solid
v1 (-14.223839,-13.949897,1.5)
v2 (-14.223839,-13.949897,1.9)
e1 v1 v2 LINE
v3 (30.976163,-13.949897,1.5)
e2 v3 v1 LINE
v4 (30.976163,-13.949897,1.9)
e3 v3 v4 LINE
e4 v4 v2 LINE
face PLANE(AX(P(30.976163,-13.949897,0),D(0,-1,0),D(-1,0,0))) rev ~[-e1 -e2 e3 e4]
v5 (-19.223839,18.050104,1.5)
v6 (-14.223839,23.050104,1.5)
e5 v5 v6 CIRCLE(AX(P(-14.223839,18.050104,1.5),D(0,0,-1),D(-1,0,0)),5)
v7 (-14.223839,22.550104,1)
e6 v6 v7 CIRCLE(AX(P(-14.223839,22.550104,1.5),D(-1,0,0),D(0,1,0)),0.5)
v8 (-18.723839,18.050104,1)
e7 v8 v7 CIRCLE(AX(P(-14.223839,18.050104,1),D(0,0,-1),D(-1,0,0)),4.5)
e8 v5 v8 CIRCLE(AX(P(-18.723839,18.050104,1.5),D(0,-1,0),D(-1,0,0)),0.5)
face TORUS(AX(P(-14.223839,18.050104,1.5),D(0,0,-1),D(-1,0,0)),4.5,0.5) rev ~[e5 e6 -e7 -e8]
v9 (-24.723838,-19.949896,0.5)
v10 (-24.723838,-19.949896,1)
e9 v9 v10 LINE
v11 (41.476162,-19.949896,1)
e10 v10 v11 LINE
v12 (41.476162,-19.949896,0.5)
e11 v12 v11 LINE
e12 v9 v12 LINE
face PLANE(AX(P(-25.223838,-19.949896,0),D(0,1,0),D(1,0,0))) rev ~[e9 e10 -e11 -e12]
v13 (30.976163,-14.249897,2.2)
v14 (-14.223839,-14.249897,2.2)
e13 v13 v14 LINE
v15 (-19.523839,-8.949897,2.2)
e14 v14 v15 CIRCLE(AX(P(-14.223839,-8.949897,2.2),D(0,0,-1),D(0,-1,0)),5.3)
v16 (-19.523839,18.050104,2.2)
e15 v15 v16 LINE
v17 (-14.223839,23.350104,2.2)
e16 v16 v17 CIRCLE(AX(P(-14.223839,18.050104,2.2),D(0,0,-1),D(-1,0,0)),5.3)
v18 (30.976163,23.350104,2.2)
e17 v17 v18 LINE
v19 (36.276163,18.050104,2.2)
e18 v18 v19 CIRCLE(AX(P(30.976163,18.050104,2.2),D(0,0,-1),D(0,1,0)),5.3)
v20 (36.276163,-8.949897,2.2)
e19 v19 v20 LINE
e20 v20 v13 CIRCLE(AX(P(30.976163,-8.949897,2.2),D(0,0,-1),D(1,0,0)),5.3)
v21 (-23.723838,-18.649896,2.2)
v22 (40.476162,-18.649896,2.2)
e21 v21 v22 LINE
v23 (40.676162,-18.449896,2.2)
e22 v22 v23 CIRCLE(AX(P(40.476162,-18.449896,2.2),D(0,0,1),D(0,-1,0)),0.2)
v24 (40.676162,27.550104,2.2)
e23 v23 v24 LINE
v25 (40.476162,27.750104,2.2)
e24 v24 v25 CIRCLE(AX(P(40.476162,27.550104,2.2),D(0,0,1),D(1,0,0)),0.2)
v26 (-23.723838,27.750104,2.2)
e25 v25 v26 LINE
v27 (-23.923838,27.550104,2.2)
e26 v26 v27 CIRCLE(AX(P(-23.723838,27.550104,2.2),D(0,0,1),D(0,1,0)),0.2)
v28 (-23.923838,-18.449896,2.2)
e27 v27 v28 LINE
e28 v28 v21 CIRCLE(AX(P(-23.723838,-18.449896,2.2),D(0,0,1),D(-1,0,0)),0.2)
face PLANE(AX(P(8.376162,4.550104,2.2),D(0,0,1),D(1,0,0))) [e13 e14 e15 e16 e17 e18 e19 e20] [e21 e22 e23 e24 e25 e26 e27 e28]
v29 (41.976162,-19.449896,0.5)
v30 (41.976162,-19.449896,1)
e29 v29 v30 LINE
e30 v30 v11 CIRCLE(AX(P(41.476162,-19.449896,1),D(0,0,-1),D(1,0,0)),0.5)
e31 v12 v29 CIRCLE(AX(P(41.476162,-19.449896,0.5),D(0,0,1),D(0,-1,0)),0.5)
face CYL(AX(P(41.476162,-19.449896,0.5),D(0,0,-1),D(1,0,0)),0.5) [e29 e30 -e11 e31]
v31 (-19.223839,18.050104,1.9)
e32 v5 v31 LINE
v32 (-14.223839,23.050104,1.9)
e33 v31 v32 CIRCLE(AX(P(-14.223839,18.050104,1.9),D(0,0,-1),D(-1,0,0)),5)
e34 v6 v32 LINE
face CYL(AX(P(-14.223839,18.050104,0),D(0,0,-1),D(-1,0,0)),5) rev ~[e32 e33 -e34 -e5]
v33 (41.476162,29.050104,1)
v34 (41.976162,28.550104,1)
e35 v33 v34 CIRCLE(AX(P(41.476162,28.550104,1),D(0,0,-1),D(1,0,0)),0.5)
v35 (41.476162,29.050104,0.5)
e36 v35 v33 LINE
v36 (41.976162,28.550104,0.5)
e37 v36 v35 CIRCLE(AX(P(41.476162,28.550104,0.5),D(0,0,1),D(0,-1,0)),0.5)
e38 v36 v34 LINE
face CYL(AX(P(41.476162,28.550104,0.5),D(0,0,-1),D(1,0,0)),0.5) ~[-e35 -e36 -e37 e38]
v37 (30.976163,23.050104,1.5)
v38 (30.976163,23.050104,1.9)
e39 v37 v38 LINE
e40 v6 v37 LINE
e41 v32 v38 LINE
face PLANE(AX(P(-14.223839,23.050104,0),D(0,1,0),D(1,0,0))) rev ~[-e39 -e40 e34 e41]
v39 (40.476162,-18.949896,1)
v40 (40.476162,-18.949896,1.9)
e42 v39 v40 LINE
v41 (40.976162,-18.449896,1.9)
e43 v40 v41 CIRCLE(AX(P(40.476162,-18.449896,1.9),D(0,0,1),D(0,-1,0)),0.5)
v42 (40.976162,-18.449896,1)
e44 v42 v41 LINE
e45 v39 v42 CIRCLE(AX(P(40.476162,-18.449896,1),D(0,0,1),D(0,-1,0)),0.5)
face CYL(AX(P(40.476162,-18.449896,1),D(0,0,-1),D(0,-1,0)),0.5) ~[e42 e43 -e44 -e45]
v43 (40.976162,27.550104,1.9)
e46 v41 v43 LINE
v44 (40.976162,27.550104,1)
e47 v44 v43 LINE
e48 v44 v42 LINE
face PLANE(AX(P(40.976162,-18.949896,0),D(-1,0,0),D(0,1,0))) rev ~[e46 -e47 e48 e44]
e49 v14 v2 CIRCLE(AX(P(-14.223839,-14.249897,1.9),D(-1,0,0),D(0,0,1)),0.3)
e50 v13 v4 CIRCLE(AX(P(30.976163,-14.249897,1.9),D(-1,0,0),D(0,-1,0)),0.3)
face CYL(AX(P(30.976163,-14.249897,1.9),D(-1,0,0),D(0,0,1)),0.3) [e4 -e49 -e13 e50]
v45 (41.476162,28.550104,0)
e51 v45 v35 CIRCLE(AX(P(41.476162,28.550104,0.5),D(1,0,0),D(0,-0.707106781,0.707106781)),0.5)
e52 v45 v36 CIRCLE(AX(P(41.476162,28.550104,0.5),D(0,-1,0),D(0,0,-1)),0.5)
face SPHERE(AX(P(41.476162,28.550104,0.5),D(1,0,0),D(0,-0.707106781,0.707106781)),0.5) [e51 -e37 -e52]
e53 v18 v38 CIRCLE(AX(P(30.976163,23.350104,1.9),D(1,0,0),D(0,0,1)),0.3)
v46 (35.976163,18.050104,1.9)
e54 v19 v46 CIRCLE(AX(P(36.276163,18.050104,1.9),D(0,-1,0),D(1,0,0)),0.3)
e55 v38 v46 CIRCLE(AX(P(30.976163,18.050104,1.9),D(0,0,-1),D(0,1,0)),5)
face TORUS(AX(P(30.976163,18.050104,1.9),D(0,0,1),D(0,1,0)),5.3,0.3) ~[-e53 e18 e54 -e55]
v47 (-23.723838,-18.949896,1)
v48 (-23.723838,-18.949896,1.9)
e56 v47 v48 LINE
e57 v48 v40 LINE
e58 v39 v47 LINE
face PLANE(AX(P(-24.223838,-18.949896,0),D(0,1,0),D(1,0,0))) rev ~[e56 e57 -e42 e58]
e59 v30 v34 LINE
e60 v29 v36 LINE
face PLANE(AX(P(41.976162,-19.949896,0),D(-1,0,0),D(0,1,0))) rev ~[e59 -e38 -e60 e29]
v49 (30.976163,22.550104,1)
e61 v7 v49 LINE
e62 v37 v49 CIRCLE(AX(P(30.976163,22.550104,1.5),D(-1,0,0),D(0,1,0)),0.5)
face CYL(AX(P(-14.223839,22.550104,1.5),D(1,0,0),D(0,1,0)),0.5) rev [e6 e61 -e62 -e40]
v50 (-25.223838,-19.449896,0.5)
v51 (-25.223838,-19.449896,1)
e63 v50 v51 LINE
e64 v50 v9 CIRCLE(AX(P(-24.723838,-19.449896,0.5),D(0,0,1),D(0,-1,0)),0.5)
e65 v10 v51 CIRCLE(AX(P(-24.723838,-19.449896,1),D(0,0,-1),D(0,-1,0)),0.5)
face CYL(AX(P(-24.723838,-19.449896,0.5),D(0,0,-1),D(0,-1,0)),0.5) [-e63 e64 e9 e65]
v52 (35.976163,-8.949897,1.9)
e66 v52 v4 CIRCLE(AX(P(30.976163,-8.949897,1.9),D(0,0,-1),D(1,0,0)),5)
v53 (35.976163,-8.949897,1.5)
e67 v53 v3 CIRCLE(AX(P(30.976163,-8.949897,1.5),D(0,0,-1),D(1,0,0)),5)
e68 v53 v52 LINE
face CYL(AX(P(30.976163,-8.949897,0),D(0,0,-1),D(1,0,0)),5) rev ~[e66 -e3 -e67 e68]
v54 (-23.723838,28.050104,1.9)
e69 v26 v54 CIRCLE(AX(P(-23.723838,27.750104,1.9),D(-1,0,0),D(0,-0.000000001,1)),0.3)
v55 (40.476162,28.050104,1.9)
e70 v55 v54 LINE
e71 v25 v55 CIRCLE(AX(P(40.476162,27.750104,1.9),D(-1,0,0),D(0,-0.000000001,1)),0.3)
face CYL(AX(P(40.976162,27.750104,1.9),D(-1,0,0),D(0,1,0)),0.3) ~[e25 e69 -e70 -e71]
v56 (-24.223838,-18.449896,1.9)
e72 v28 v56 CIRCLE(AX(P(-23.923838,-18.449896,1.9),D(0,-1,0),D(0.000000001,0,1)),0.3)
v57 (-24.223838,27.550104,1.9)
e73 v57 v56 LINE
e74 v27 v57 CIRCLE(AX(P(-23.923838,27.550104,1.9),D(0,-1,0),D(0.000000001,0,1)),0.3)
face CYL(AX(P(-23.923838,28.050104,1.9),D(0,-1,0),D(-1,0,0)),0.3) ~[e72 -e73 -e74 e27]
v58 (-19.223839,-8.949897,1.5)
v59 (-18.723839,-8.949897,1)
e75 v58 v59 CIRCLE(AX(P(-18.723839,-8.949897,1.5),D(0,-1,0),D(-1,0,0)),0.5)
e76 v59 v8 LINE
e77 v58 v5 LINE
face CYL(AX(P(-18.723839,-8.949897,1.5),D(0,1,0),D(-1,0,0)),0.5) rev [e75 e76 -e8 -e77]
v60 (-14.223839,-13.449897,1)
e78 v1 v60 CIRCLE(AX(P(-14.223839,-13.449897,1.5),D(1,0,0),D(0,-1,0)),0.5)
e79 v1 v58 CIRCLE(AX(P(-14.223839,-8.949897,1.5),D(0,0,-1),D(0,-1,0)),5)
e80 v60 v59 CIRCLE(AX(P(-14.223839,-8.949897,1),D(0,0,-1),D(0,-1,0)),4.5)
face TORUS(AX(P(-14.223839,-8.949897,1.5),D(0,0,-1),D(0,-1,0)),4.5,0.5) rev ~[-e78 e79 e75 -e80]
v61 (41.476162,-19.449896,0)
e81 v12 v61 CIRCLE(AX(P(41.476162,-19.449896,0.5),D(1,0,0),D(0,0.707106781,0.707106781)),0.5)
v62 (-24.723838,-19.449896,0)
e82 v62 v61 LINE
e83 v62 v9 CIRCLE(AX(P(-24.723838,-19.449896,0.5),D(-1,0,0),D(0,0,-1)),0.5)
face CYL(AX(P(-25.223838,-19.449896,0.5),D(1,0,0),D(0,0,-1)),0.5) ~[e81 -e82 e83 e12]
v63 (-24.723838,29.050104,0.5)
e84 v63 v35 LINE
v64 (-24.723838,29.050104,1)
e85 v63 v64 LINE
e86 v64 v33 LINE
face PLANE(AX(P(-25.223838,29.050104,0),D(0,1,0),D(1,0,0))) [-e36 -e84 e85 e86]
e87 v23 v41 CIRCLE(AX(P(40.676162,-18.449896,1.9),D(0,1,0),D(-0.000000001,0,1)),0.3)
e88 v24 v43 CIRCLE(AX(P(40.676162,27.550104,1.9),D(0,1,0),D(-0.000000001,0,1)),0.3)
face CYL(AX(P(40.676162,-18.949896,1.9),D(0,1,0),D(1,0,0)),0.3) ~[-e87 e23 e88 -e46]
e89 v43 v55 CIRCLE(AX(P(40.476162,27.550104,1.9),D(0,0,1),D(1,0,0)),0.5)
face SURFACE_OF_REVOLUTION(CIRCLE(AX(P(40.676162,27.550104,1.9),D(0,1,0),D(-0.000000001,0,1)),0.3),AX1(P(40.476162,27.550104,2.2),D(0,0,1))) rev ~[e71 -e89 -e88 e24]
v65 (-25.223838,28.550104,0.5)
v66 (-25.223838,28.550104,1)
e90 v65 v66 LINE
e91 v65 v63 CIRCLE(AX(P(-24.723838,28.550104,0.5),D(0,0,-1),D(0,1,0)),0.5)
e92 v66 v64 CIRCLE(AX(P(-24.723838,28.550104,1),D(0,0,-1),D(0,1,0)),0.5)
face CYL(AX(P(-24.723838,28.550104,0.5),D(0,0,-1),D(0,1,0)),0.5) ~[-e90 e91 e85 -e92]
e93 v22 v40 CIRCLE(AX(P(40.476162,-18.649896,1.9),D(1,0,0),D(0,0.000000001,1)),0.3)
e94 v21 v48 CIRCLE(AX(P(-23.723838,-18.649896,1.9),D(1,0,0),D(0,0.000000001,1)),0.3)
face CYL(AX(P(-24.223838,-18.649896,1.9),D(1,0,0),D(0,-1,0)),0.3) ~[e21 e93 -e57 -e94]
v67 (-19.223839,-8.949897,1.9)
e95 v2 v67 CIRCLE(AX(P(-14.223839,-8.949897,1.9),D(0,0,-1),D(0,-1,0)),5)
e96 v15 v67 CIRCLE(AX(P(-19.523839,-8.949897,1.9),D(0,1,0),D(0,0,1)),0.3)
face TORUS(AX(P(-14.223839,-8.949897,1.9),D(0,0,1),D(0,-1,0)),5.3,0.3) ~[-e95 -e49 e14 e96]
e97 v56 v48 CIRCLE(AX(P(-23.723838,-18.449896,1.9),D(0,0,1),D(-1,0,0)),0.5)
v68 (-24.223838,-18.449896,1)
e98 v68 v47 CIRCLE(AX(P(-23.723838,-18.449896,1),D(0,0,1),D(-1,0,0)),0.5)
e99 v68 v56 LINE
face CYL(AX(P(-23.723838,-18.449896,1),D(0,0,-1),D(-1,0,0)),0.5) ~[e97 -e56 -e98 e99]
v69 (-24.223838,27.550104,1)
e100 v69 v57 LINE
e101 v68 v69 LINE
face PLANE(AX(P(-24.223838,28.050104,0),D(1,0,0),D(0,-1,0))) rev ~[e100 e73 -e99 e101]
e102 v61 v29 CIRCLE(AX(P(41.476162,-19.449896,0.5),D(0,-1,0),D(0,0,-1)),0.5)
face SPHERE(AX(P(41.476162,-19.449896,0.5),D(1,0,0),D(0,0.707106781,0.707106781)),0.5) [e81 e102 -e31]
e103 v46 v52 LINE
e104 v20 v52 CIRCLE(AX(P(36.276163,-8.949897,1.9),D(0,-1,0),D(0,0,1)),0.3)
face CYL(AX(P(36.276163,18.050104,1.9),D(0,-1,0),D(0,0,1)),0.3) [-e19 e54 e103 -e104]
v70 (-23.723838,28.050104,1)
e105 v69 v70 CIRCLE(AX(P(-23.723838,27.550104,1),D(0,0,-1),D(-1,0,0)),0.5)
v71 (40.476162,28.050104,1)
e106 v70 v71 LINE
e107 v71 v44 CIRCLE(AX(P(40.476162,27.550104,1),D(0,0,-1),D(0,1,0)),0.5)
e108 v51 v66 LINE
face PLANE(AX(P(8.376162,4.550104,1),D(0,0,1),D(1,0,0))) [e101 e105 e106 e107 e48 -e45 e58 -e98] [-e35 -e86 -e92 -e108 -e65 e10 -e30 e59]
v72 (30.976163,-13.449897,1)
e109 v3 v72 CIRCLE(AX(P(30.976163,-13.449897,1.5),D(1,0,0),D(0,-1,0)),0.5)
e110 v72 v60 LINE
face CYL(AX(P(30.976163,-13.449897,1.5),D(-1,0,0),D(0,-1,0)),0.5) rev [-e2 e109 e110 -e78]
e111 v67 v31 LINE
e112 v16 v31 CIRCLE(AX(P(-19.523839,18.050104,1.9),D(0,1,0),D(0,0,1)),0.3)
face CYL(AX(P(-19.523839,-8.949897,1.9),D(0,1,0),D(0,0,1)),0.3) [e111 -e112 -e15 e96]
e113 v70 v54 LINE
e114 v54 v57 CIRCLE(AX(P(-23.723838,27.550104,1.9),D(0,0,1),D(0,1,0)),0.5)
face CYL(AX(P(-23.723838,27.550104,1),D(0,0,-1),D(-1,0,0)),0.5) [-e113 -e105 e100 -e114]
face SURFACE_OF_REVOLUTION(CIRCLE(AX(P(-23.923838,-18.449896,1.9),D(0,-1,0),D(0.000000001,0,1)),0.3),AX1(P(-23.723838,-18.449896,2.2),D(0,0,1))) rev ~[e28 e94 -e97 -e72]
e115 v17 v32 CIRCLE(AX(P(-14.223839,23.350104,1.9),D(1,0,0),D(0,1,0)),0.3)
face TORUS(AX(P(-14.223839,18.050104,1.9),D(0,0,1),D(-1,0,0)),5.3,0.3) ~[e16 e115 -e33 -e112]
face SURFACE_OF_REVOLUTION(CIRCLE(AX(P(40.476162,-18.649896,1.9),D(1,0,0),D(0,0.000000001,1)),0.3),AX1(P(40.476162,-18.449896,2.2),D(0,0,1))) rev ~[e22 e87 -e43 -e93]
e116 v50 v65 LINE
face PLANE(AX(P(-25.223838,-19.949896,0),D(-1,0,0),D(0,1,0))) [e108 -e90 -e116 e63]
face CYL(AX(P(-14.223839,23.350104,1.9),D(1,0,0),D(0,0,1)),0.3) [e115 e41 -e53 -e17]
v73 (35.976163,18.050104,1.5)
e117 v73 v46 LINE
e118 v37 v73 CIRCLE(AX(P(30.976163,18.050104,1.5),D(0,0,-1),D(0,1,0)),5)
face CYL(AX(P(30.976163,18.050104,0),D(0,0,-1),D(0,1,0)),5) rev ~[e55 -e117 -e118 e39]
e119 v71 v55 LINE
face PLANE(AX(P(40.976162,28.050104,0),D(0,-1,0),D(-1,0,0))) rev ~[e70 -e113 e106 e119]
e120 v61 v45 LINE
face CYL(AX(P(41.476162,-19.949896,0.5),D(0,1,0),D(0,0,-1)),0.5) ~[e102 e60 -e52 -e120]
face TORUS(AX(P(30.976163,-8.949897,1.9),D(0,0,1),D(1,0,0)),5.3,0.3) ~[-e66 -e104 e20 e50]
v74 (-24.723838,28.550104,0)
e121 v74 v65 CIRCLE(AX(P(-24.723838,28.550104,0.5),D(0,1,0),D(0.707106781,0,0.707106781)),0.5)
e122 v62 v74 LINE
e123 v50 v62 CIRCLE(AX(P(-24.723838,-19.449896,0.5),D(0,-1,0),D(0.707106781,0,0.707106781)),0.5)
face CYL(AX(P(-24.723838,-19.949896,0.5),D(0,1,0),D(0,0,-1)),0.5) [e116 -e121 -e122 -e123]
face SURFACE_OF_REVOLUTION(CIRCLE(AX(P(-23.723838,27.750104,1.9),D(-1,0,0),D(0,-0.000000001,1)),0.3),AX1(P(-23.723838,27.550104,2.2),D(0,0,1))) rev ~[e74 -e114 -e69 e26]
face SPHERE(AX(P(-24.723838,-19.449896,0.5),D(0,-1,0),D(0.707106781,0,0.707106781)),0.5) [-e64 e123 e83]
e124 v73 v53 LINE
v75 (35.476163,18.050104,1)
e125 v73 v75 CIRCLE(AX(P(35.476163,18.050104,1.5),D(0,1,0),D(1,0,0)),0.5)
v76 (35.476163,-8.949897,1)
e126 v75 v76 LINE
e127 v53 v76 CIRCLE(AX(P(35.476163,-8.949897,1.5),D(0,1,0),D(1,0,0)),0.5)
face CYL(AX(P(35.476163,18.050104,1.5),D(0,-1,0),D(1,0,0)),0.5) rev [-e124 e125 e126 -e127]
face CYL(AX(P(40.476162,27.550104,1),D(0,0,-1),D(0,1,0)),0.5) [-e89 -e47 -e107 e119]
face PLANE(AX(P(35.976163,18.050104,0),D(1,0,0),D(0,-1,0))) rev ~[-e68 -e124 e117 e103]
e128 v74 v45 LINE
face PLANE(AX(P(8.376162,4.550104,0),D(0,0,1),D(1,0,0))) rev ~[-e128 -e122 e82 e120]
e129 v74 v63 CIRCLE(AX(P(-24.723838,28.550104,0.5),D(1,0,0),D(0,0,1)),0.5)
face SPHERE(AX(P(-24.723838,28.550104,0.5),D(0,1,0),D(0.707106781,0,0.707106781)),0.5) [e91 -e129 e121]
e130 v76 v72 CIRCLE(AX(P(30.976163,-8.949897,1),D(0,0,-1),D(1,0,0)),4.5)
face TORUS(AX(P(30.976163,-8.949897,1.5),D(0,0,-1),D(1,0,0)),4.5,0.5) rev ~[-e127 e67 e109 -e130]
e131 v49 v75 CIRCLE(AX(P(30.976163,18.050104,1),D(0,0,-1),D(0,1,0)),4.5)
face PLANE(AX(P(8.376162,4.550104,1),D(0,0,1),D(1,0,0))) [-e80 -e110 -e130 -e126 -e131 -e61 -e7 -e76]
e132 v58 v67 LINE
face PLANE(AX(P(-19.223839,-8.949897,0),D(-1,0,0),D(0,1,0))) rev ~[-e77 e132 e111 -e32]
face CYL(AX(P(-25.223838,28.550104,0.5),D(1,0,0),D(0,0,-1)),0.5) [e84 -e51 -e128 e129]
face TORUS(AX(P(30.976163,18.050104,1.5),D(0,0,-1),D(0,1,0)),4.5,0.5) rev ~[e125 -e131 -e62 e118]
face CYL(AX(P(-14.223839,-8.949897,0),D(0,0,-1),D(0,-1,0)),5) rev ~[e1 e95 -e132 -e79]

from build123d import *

# Parameters (mm, degrees)
F0_W         = 67.2
F0_H         = 49
F1_DEPTH     = 1
F2_DEPTH     = 2.2
F3_R         = 0.5
F4_R         = 0.3
F5_S2_W      = 0.5
F5_S2_H      = 0.5
F5_T3_DEPTH  = 0.5
F5_T8_ANGLE  = 90
F5_S10_W     = 0.5
F5_S10_H     = 0.5
F5_T11_DEPTH = 0.5
F5_T16_ANGLE = 90
F5_S18_W     = 0.5
F5_S18_H     = 0.5
F5_T19_DEPTH = 0.5
F5_T24_ANGLE = 90
F5_S26_W     = 0.5
F5_S26_H     = 0.5
F5_T27_DEPTH = 0.5
F5_T32_ANGLE = 90
F5_T35_DEPTH = 1.2
F5_T38_DEPTH = 1.75
F5_T41_DEPTH = 1.2
F5_T44_DEPTH = 1.75
F5_T47_DEPTH = 1.2
F5_T50_DEPTH = 1.75
F5_T53_DEPTH = 1.2
F5_T56_DEPTH = 1.75
F6_R         = 0.5


# Not quite as in the source:
# - a fillet or chamfer that OpenCascade refuses, or shapes differently, is made with other operations: its cross-section is extruded or revolved along the edge and cut away or added


with BuildPart() as f1:
    # F0 (on Top) → F1 (new body)
    with BuildSketch(Plane.XY):
        with Locations((8.3761618346, 4.5501037389)):
            Rectangle(F0_W, F0_H)
        Polygon((-24.2238381654, 20.0501037389), (-24.2238381654, 28.0501037389), (-16.2238381654, 28.0501037389), (32.9761618346, 28.0501037389), (40.9761618346, 28.0501037389), (40.9761618346, 20.0501037389), (40.9761618346, -10.9498962611), (40.9761618346, -18.9498962611), (32.9761618346, -18.9498962611), (-16.2238381654, -18.9498962611), (-24.2238381654, -18.9498962611), (-24.2238381654, -10.9498962611), align=None, mode=Mode.SUBTRACT)
        Polygon((-16.2238381654, 28.0501037389), (-24.2238381654, 28.0501037389), (-24.2238381654, 20.0501037389), (-24.2238381654, -10.9498962611), (-24.2238381654, -18.9498962611), (-16.2238381654, -18.9498962611), (32.9761618346, -18.9498962611), (40.9761618346, -18.9498962611), (40.9761618346, -10.9498962611), (40.9761618346, 20.0501037389), (40.9761618346, 28.0501037389), (32.9761618346, 28.0501037389), align=None)
        with BuildLine():
            ThreePointArc((-19.2238390446, 18.0501037389), (-17.7593729505, 21.5856376448), (-14.2238390446, 23.0501037389))
            Line((-14.2238390446, 23.0501037389), (30.9761627138, 23.0501037389))
            ThreePointArc((30.9761627138, 23.0501037389), (34.5116966197, 21.5856376448), (35.9761627138, 18.0501037389))
            Line((35.9761627138, 18.0501037389), (35.9761627138, -8.9498971403))
            ThreePointArc((35.9761627138, -8.9498971403), (34.5116966197, -12.4854310462), (30.9761627138, -13.9498971403))
            Line((30.9761627138, -13.9498971403), (-14.2238390446, -13.9498971403))
            ThreePointArc((-14.2238390446, -13.9498971403), (-17.7593729505, -12.4854310462), (-19.2238390446, -8.9498971403))
            Line((-19.2238390446, -8.9498971403), (-19.2238390446, 18.0501037389))
        make_face(mode=Mode.SUBTRACT)
        with BuildLine():
            Line((30.9761627138, 23.0501037389), (-14.2238390446, 23.0501037389))
            ThreePointArc((-14.2238390446, 23.0501037389), (-17.7593729505, 21.5856376448), (-19.2238390446, 18.0501037389))
            Line((-19.2238390446, 18.0501037389), (-19.2238390446, -8.9498971403))
            ThreePointArc((-19.2238390446, -8.9498971403), (-17.7593729505, -12.4854310462), (-14.2238390446, -13.9498971403))
            Line((-14.2238390446, -13.9498971403), (30.9761627138, -13.9498971403))
            ThreePointArc((30.9761627138, -13.9498971403), (34.5116966197, -12.4854310462), (35.9761627138, -8.9498971403))
            Line((35.9761627138, -8.9498971403), (35.9761627138, 18.0501037389))
            ThreePointArc((35.9761627138, 18.0501037389), (34.5116966197, 21.5856376448), (30.9761627138, 23.0501037389))
        make_face()
    extrude(amount=F1_DEPTH)

    # F0 (on Top) → F2 (join)
    with BuildSketch(Plane.XY):
        Polygon((-16.2238381654, 28.0501037389), (-24.2238381654, 28.0501037389), (-24.2238381654, 20.0501037389), (-24.2238381654, -10.9498962611), (-24.2238381654, -18.9498962611), (-16.2238381654, -18.9498962611), (32.9761618346, -18.9498962611), (40.9761618346, -18.9498962611), (40.9761618346, -10.9498962611), (40.9761618346, 20.0501037389), (40.9761618346, 28.0501037389), (32.9761618346, 28.0501037389), align=None)
        with BuildLine():
            ThreePointArc((-19.2238390446, 18.0501037389), (-17.7593729505, 21.5856376448), (-14.2238390446, 23.0501037389))
            Line((-14.2238390446, 23.0501037389), (30.9761627138, 23.0501037389))
            ThreePointArc((30.9761627138, 23.0501037389), (34.5116966197, 21.5856376448), (35.9761627138, 18.0501037389))
            Line((35.9761627138, 18.0501037389), (35.9761627138, -8.9498971403))
            ThreePointArc((35.9761627138, -8.9498971403), (34.5116966197, -12.4854310462), (30.9761627138, -13.9498971403))
            Line((30.9761627138, -13.9498971403), (-14.2238390446, -13.9498971403))
            ThreePointArc((-14.2238390446, -13.9498971403), (-17.7593729505, -12.4854310462), (-19.2238390446, -8.9498971403))
            Line((-19.2238390446, -8.9498971403), (-19.2238390446, 18.0501037389))
        make_face(mode=Mode.SUBTRACT)
    extrude(amount=F2_DEPTH)

    # F3
    f3_edges = [f1.edges().sort_by_distance(p)[0] for p in [
        (41.976162, 4.550104, 0),
        (8.376162, 29.050104, 0),
        (-25.223838, 4.550104, 0),
        (8.376162, -19.949896, 0),
    ]]
    fillet(f3_edges, radius=F3_R)

    # F4
    f4_edges = [f1.edges().sort_by_distance(p)[0] for p in [
        (8.376162, 28.050104, 2.2),
        (-24.223838, 4.550104, 2.2),
        (8.376162, -18.949896, 2.2),
        (40.976162, 4.550104, 2.2),
        (-19.223839, 4.550103, 2.2),
        (-17.759373, 21.585638, 2.2),
        (8.376162, 23.050104, 2.2),
        (34.511697, 21.585638, 2.2),
        (35.976163, 4.550103, 2.2),
        (34.511697, -12.485431, 2.2),
        (8.376162, -13.949897, 2.2),
        (-17.759373, -12.485431, 2.2),
    ]]
    fillet(f4_edges, radius=F4_R)

    # F5: fillet of radius 0.5 on 8 edges, made by hand


with BuildPart() as f5_tool1:
    # F5_s2 → F5_t3 (new body)
    with BuildSketch(Plane.XZ.offset(-28.5501037389)):
        with Locations((-24.9738381654, 0.25)):
            Rectangle(F5_S2_W, F5_S2_H)
    extrude(amount=-F5_T3_DEPTH)

    # F5_s4 → F5_t5 (revolve, cut)
    with BuildSketch(Plane(origin=(-24.7238381654, 28.5501037389, 0.5), x_dir=(0.7071067812, 0, 0.7071067812), z_dir=(-0.7071067812, 0, 0.7071067812))):
        with BuildLine():
            ThreePointArc((0, -0.5), (0.5, 0), (0, 0.5))
            Line((0, 0.5), (0, -0.5))
        make_face()
    revolve(axis=Axis((-24.7238381654, 28.5501037389, 0.5), (0, 1, 0)), mode=Mode.SUBTRACT)


with BuildPart() as f5_tool6:
    # F5_s7 → F5_t8 (revolve)
    with BuildSketch(Plane.YZ.offset(-23.7238381654)):
        with BuildLine():
            ThreePointArc((27.7501037389, 2.2), (27.9622357733, 2.1121320344), (28.0501037389, 1.9))
            Line((28.0501037389, 1.9), (28.0501037389, 2.2))
            Line((28.0501037389, 2.2), (27.7501037389, 2.2))
        make_face()
    revolve(axis=Axis((-23.7238381654, 27.5501037389, 2.2), (0, 0, 1)), revolution_arc=F5_T8_ANGLE)


with BuildPart() as f5_tool9:
    # F5_s10 → F5_t11 (new body)
    with BuildSketch(Plane.XZ.offset(19.4498962611)):
        with Locations((-24.9738381654, 0.25)):
            Rectangle(F5_S10_W, F5_S10_H)
    extrude(amount=F5_T11_DEPTH)

    # F5_s12 → F5_t13 (revolve, cut)
    with BuildSketch(Plane(origin=(-24.7238381654, -19.4498962611, 0.5), x_dir=(0.7071067812, 0, 0.7071067812), z_dir=(0.7071067812, 0, -0.7071067812))):
        with BuildLine():
            ThreePointArc((0, -0.5), (0.5, 0), (0, 0.5))
            Line((0, 0.5), (0, -0.5))
        make_face()
    revolve(axis=Axis((-24.7238381654, -19.4498962611, 0.5), (0, -1, 0)), mode=Mode.SUBTRACT)


with BuildPart() as f5_tool14:
    # F5_s15 → F5_t16 (revolve)
    with BuildSketch(Plane.XZ.offset(18.4498962611)):
        with BuildLine():
            ThreePointArc((-23.9238381654, 2.2), (-24.1359701998, 2.1121320344), (-24.2238381654, 1.9))
            Line((-24.2238381654, 1.9), (-24.2238381654, 2.2))
            Line((-24.2238381654, 2.2), (-23.9238381654, 2.2))
        make_face()
    revolve(axis=Axis((-23.7238381654, -18.4498962611, 2.2), (0, 0, 1)), revolution_arc=F5_T16_ANGLE)


with BuildPart() as f5_tool17:
    # F5_s18 → F5_t19 (new body)
    with BuildSketch(Plane.YZ.offset(41.4761618346)):
        with Locations((-19.6998962611, 0.25)):
            Rectangle(F5_S18_W, F5_S18_H)
    extrude(amount=F5_T19_DEPTH)

    # F5_s20 → F5_t21 (revolve, cut)
    with BuildSketch(Plane(origin=(41.4761618346, -19.4498962611, 0.5), x_dir=(0, 0.7071067812, 0.7071067812), z_dir=(0, 0.7071067812, -0.7071067812))):
        with BuildLine():
            ThreePointArc((0, -0.5), (0.5, 0), (0, 0.5))
            Line((0, 0.5), (0, -0.5))
        make_face()
    revolve(axis=Axis((41.4761618346, -19.4498962611, 0.5), (1, 0, 0)), mode=Mode.SUBTRACT)


with BuildPart() as f5_tool22:
    # F5_s23 → F5_t24 (revolve)
    with BuildSketch(Plane.YZ.offset(40.4761618346)):
        with BuildLine():
            ThreePointArc((-18.6498962611, 2.2), (-18.8620282955, 2.1121320344), (-18.9498962611, 1.9))
            Line((-18.9498962611, 1.9), (-18.9498962611, 2.2))
            Line((-18.9498962611, 2.2), (-18.6498962611, 2.2))
        make_face()
    revolve(axis=Axis((40.4761618346, -18.4498962611, 2.2), (0, 0, 1)), revolution_arc=F5_T24_ANGLE)


with BuildPart() as f5_tool25:
    # F5_s26 → F5_t27 (new body)
    with BuildSketch(Plane.YZ.offset(41.4761618346)):
        with Locations((28.8001037389, 0.25)):
            Rectangle(F5_S26_W, F5_S26_H)
    extrude(amount=F5_T27_DEPTH)

    # F5_s28 → F5_t29 (revolve, cut)
    with BuildSketch(Plane(origin=(41.4761618346, 28.5501037389, 0.5), x_dir=(0, -0.7071067812, 0.7071067812), z_dir=(0, 0.7071067812, 0.7071067812))):
        with BuildLine():
            ThreePointArc((0, -0.5), (0.5, 0), (0, 0.5))
            Line((0, 0.5), (0, -0.5))
        make_face()
    revolve(axis=Axis((41.4761618346, 28.5501037389, 0.5), (1, 0, 0)), mode=Mode.SUBTRACT)


with BuildPart() as f5_tool30:
    # F5_s31 → F5_t32 (revolve)
    with BuildSketch(Plane.XZ.offset(-27.5501037389)):
        with BuildLine():
            ThreePointArc((40.6761618346, 2.2), (40.888293869, 2.1121320344), (40.9761618346, 1.9))
            Line((40.9761618346, 1.9), (40.9761618346, 2.2))
            Line((40.9761618346, 2.2), (40.6761618346, 2.2))
        make_face()
    revolve(axis=Axis((40.4761618346, 27.5501037389, 2.2), (0, 0, 1)), revolution_arc=F5_T32_ANGLE)


with BuildPart() as f5_tool33:
    # F5_s34 → F5_t35 (new body)
    with BuildSketch(Plane.XY.offset(1)):
        with BuildLine():
            ThreePointArc((40.4761618346, 28.0501037389), (40.8297152252, 27.9036571295), (40.9761618346, 27.5501037389))
            Line((40.9761618346, 27.5501037389), (40.9761618346, 28.0501037389))
            Line((40.9761618346, 28.0501037389), (40.4761618346, 28.0501037389))
        make_face()
    extrude(amount=F5_T35_DEPTH)


with BuildPart() as f5_tool36:
    # F5_s37 → F5_t38 (new body)
    with BuildSketch(Plane.XY.offset(0.5)):
        with BuildLine():
            ThreePointArc((41.9761618346, 28.5501037389), (41.8297152252, 28.9036571295), (41.4761618346, 29.0501037389))
            Line((41.4761618346, 29.0501037389), (41.9761618346, 29.0501037389))
            Line((41.9761618346, 29.0501037389), (41.9761618346, 28.5501037389))
        make_face()
    extrude(amount=F5_T38_DEPTH)


with BuildPart() as f5_tool39:
    # F5_s40 → F5_t41 (new body)
    with BuildSketch(Plane.XY.offset(1)):
        with BuildLine():
            ThreePointArc((40.4761618346, -18.9498962611), (40.8297152252, -18.8034496517), (40.9761618346, -18.4498962611))
            Line((40.9761618346, -18.4498962611), (40.9761618346, -18.9498962611))
            Line((40.9761618346, -18.9498962611), (40.4761618346, -18.9498962611))
        make_face()
    extrude(amount=F5_T41_DEPTH)


with BuildPart() as f5_tool42:
    # F5_s43 → F5_t44 (new body)
    with BuildSketch(Plane.XY.offset(0.5)):
        with BuildLine():
            ThreePointArc((41.9761618346, -19.4498962611), (41.8297152252, -19.8034496517), (41.4761618346, -19.9498962611))
            Line((41.4761618346, -19.9498962611), (41.9761618346, -19.9498962611))
            Line((41.9761618346, -19.9498962611), (41.9761618346, -19.4498962611))
        make_face()
    extrude(amount=F5_T44_DEPTH)


with BuildPart() as f5_tool45:
    # F5_s46 → F5_t47 (new body)
    with BuildSketch(Plane.XY.offset(1)):
        with BuildLine():
            ThreePointArc((-24.2238381654, -18.4498962611), (-24.077391556, -18.8034496517), (-23.7238381654, -18.9498962611))
            Line((-23.7238381654, -18.9498962611), (-24.2238381654, -18.9498962611))
            Line((-24.2238381654, -18.9498962611), (-24.2238381654, -18.4498962611))
        make_face()
    extrude(amount=F5_T47_DEPTH)


with BuildPart() as f5_tool48:
    # F5_s49 → F5_t50 (new body)
    with BuildSketch(Plane.XY.offset(0.5)):
        with BuildLine():
            ThreePointArc((-24.7238381654, -19.9498962611), (-25.077391556, -19.8034496517), (-25.2238381654, -19.4498962611))
            Line((-25.2238381654, -19.4498962611), (-25.2238381654, -19.9498962611))
            Line((-25.2238381654, -19.9498962611), (-24.7238381654, -19.9498962611))
        make_face()
    extrude(amount=F5_T50_DEPTH)


with BuildPart() as f5_tool51:
    # F5_s52 → F5_t53 (new body)
    with BuildSketch(Plane.XY.offset(1)):
        with BuildLine():
            ThreePointArc((-24.2238381654, 27.5501037389), (-24.077391556, 27.9036571295), (-23.7238381654, 28.0501037389))
            Line((-23.7238381654, 28.0501037389), (-24.2238381654, 28.0501037389))
            Line((-24.2238381654, 28.0501037389), (-24.2238381654, 27.5501037389))
        make_face()
    extrude(amount=F5_T53_DEPTH)


with BuildPart() as f5_tool54:
    # F5_s55 → F5_t56 (new body)
    with BuildSketch(Plane.XY.offset(0.5)):
        with BuildLine():
            ThreePointArc((-24.7238381654, 29.0501037389), (-25.077391556, 28.9036571295), (-25.2238381654, 28.5501037389))
            Line((-25.2238381654, 28.5501037389), (-25.2238381654, 29.0501037389))
            Line((-25.2238381654, 29.0501037389), (-24.7238381654, 29.0501037389))
        make_face()
    extrude(amount=F5_T56_DEPTH)


with BuildPart() as f1_1:
    add(f1.part)

    # F5_t57: cut F5_tool1, F5_tool6, F5_tool9, F5_tool14, F5_tool17, F5_tool22, F5_tool25, F5_tool30, F5_tool33, F5_tool36, F5_tool39, F5_tool42, F5_tool45, F5_tool48, F5_tool51, F5_tool54
    add([f5_tool1.part, f5_tool6.part, f5_tool9.part, f5_tool14.part, f5_tool17.part, f5_tool22.part, f5_tool25.part, f5_tool30.part, f5_tool33.part, f5_tool36.part, f5_tool39.part, f5_tool42.part, f5_tool45.part, f5_tool48.part, f5_tool51.part, f5_tool54.part], mode=Mode.SUBTRACT)

    # F6
    f6_edges = [f1_1.edges().sort_by_distance(p)[0] for p in [
        (-17.759373, -12.485431, 1),
        (-19.223839, 4.550103, 1),
        (-17.759373, 21.585638, 1),
        (8.376162, 23.050104, 1),
        (34.511697, 21.585638, 1),
        (35.976163, 4.550103, 1),
        (34.511697, -12.485431, 1),
        (8.376162, -13.949897, 1),
    ]]
    fillet(f6_edges, radius=F6_R)


solid = f1_1.part
